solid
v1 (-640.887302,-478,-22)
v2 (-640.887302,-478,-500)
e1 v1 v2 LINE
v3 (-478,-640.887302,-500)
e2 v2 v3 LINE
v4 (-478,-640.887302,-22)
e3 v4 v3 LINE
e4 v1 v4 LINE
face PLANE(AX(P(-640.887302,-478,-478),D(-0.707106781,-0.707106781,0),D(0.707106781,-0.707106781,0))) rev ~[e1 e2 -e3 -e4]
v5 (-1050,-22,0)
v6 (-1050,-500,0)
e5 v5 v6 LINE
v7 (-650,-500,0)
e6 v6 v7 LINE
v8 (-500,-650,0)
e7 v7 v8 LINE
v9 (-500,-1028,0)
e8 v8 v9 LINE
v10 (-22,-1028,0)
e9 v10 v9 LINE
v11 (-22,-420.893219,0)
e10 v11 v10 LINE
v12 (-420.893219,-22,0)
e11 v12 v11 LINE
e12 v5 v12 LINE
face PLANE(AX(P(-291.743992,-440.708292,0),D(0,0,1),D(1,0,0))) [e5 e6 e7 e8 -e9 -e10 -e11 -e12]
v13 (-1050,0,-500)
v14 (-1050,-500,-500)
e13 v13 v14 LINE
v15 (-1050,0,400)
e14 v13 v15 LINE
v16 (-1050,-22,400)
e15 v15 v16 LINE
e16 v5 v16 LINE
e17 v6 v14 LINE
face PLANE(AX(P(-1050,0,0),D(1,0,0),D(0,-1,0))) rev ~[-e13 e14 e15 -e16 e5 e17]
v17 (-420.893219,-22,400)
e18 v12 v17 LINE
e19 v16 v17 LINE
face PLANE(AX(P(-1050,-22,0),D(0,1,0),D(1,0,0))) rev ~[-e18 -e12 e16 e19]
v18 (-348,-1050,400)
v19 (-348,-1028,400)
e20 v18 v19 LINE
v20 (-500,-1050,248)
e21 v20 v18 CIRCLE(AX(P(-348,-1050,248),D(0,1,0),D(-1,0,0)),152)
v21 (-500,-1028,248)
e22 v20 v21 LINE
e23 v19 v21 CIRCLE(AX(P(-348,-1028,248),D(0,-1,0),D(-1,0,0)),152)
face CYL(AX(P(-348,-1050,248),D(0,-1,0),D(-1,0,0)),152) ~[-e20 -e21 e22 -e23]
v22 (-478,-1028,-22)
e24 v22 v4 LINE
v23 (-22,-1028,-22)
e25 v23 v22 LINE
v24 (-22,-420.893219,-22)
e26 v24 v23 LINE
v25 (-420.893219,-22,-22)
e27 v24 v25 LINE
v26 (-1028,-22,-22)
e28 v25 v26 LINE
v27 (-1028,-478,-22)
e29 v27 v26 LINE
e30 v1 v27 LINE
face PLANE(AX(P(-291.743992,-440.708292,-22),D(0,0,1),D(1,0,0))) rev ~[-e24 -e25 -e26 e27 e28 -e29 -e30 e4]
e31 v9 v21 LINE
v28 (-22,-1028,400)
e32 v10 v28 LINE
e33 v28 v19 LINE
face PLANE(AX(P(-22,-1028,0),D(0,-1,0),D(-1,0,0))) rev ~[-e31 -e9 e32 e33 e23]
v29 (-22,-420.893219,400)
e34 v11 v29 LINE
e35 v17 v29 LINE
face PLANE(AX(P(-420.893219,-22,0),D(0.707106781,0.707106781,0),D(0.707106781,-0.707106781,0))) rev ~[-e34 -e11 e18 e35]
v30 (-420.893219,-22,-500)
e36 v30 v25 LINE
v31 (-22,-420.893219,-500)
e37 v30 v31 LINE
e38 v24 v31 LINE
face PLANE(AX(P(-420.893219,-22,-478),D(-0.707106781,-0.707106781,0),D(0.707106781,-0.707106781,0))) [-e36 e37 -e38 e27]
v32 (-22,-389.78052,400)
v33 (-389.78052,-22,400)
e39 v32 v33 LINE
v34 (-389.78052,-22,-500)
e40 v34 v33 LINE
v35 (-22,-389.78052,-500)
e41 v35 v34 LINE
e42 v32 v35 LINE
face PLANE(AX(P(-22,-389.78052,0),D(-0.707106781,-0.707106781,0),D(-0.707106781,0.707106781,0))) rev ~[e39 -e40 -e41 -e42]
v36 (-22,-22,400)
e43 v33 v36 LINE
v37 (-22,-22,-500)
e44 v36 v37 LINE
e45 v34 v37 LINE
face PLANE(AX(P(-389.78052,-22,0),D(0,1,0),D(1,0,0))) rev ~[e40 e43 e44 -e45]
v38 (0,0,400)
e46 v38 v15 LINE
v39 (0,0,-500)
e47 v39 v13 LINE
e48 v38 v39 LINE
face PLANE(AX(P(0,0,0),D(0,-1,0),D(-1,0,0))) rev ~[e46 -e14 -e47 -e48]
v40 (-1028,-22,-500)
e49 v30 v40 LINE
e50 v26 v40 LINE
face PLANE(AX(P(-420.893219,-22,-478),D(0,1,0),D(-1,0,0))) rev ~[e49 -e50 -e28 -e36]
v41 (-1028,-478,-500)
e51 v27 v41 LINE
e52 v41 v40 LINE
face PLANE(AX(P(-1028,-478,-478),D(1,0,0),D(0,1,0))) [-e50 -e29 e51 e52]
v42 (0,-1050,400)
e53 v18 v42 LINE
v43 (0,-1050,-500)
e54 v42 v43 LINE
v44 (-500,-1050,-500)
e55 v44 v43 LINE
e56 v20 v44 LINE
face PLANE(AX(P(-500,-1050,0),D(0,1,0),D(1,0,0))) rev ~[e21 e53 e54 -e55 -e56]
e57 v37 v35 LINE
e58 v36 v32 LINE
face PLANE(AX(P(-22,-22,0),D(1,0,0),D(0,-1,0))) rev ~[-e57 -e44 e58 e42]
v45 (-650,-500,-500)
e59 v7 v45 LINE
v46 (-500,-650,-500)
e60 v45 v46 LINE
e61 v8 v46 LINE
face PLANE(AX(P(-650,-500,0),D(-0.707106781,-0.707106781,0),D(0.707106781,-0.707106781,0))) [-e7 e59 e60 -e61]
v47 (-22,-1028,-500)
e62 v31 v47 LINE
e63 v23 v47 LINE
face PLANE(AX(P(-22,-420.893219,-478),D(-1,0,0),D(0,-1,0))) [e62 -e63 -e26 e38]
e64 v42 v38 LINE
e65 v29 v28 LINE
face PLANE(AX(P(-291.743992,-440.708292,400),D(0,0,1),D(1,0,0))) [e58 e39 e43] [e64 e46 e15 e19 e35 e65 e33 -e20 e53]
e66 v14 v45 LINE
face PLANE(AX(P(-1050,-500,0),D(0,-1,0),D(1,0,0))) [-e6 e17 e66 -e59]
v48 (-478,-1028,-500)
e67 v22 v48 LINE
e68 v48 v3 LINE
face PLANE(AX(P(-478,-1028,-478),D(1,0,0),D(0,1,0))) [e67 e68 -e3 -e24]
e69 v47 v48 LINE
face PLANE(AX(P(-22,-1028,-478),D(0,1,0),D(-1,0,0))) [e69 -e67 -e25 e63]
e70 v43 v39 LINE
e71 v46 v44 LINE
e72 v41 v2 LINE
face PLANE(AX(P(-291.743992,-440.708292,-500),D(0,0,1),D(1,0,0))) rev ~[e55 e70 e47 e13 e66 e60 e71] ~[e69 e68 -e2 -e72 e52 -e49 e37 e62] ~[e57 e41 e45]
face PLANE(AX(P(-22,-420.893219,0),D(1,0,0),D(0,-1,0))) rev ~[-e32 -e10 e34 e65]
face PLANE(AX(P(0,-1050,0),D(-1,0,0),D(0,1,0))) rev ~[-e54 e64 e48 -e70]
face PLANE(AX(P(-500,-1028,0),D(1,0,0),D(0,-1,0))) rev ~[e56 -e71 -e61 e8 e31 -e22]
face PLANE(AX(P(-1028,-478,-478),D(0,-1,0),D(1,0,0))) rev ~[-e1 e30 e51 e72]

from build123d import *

# Parameters (mm, degrees)
F1_DEPTH = 500
F2_DEPTH = 400
F3_T     = -22
F5_DEPTH = 25


# Not quite as in the source:
# - a shell that OpenCascade refuses in one call is made with other operations: the cavity is built on its own and cut out


with BuildPart() as f1:
    # F0 (on Top) → F1 (new body)
    with BuildSketch(Plane.XY):
        Polygon((0, 0), (-1050, 0), (-1050, -22), (-420.8932188135, -22), (-22, -420.8932188135), (-22, -1028), (-500, -1028), (-500, -1050), (0, -1050), align=None)
        Polygon((-389.7805204412, -22), (-22, -22), (-22, -389.7805204412), align=None, mode=Mode.SUBTRACT)
        Polygon((-420.8932188135, -22), (-1050, -22), (-1050, -500), (-650, -500), (-500, -650), (-500, -1028), (-22, -1028), (-22, -420.8932188135), align=None)
    extrude(amount=-F1_DEPTH)

    # F0 (on Top) → F2 (join)
    with BuildSketch(Plane.XY):
        Polygon((0, 0), (-1050, 0), (-1050, -22), (-420.8932188135, -22), (-22, -420.8932188135), (-22, -1028), (-500, -1028), (-500, -1050), (0, -1050), align=None)
        Polygon((-389.7805204412, -22), (-22, -22), (-22, -389.7805204412), align=None, mode=Mode.SUBTRACT)
    extrude(amount=F2_DEPTH)

    # F3: a shell. OpenCascade refuses it in one call, so the cavity is built on its own and cut out:
    # the body offset inwards by the wall thickness, plus a prism from it out through each open face.
    f3_core = offset(f1.part, amount=F3_T, kind=Kind.INTERSECTION, mode=Mode.PRIVATE)
    f3_exits = [f3_core.faces().sort_by_distance(p)[0] for p in [
        (-463.695201, -463.695201, -478),
    ]]
    add(f3_core, mode=Mode.SUBTRACT)
    extrude(f3_exits, amount=-F3_T, mode=Mode.SUBTRACT)

    # F4 (on face) → F5 (cut)
    with BuildSketch(Plane.XZ.offset(1050)):
        with BuildLine():
            ThreePointArc((-500, 248), (-455.4802307404, 355.4802307404), (-348, 400))
            Line((-348, 400), (-500, 400))
            Line((-500, 400), (-500, 248))
        make_face()
    extrude(amount=-F5_DEPTH, mode=Mode.SUBTRACT)


solid = f1.part
